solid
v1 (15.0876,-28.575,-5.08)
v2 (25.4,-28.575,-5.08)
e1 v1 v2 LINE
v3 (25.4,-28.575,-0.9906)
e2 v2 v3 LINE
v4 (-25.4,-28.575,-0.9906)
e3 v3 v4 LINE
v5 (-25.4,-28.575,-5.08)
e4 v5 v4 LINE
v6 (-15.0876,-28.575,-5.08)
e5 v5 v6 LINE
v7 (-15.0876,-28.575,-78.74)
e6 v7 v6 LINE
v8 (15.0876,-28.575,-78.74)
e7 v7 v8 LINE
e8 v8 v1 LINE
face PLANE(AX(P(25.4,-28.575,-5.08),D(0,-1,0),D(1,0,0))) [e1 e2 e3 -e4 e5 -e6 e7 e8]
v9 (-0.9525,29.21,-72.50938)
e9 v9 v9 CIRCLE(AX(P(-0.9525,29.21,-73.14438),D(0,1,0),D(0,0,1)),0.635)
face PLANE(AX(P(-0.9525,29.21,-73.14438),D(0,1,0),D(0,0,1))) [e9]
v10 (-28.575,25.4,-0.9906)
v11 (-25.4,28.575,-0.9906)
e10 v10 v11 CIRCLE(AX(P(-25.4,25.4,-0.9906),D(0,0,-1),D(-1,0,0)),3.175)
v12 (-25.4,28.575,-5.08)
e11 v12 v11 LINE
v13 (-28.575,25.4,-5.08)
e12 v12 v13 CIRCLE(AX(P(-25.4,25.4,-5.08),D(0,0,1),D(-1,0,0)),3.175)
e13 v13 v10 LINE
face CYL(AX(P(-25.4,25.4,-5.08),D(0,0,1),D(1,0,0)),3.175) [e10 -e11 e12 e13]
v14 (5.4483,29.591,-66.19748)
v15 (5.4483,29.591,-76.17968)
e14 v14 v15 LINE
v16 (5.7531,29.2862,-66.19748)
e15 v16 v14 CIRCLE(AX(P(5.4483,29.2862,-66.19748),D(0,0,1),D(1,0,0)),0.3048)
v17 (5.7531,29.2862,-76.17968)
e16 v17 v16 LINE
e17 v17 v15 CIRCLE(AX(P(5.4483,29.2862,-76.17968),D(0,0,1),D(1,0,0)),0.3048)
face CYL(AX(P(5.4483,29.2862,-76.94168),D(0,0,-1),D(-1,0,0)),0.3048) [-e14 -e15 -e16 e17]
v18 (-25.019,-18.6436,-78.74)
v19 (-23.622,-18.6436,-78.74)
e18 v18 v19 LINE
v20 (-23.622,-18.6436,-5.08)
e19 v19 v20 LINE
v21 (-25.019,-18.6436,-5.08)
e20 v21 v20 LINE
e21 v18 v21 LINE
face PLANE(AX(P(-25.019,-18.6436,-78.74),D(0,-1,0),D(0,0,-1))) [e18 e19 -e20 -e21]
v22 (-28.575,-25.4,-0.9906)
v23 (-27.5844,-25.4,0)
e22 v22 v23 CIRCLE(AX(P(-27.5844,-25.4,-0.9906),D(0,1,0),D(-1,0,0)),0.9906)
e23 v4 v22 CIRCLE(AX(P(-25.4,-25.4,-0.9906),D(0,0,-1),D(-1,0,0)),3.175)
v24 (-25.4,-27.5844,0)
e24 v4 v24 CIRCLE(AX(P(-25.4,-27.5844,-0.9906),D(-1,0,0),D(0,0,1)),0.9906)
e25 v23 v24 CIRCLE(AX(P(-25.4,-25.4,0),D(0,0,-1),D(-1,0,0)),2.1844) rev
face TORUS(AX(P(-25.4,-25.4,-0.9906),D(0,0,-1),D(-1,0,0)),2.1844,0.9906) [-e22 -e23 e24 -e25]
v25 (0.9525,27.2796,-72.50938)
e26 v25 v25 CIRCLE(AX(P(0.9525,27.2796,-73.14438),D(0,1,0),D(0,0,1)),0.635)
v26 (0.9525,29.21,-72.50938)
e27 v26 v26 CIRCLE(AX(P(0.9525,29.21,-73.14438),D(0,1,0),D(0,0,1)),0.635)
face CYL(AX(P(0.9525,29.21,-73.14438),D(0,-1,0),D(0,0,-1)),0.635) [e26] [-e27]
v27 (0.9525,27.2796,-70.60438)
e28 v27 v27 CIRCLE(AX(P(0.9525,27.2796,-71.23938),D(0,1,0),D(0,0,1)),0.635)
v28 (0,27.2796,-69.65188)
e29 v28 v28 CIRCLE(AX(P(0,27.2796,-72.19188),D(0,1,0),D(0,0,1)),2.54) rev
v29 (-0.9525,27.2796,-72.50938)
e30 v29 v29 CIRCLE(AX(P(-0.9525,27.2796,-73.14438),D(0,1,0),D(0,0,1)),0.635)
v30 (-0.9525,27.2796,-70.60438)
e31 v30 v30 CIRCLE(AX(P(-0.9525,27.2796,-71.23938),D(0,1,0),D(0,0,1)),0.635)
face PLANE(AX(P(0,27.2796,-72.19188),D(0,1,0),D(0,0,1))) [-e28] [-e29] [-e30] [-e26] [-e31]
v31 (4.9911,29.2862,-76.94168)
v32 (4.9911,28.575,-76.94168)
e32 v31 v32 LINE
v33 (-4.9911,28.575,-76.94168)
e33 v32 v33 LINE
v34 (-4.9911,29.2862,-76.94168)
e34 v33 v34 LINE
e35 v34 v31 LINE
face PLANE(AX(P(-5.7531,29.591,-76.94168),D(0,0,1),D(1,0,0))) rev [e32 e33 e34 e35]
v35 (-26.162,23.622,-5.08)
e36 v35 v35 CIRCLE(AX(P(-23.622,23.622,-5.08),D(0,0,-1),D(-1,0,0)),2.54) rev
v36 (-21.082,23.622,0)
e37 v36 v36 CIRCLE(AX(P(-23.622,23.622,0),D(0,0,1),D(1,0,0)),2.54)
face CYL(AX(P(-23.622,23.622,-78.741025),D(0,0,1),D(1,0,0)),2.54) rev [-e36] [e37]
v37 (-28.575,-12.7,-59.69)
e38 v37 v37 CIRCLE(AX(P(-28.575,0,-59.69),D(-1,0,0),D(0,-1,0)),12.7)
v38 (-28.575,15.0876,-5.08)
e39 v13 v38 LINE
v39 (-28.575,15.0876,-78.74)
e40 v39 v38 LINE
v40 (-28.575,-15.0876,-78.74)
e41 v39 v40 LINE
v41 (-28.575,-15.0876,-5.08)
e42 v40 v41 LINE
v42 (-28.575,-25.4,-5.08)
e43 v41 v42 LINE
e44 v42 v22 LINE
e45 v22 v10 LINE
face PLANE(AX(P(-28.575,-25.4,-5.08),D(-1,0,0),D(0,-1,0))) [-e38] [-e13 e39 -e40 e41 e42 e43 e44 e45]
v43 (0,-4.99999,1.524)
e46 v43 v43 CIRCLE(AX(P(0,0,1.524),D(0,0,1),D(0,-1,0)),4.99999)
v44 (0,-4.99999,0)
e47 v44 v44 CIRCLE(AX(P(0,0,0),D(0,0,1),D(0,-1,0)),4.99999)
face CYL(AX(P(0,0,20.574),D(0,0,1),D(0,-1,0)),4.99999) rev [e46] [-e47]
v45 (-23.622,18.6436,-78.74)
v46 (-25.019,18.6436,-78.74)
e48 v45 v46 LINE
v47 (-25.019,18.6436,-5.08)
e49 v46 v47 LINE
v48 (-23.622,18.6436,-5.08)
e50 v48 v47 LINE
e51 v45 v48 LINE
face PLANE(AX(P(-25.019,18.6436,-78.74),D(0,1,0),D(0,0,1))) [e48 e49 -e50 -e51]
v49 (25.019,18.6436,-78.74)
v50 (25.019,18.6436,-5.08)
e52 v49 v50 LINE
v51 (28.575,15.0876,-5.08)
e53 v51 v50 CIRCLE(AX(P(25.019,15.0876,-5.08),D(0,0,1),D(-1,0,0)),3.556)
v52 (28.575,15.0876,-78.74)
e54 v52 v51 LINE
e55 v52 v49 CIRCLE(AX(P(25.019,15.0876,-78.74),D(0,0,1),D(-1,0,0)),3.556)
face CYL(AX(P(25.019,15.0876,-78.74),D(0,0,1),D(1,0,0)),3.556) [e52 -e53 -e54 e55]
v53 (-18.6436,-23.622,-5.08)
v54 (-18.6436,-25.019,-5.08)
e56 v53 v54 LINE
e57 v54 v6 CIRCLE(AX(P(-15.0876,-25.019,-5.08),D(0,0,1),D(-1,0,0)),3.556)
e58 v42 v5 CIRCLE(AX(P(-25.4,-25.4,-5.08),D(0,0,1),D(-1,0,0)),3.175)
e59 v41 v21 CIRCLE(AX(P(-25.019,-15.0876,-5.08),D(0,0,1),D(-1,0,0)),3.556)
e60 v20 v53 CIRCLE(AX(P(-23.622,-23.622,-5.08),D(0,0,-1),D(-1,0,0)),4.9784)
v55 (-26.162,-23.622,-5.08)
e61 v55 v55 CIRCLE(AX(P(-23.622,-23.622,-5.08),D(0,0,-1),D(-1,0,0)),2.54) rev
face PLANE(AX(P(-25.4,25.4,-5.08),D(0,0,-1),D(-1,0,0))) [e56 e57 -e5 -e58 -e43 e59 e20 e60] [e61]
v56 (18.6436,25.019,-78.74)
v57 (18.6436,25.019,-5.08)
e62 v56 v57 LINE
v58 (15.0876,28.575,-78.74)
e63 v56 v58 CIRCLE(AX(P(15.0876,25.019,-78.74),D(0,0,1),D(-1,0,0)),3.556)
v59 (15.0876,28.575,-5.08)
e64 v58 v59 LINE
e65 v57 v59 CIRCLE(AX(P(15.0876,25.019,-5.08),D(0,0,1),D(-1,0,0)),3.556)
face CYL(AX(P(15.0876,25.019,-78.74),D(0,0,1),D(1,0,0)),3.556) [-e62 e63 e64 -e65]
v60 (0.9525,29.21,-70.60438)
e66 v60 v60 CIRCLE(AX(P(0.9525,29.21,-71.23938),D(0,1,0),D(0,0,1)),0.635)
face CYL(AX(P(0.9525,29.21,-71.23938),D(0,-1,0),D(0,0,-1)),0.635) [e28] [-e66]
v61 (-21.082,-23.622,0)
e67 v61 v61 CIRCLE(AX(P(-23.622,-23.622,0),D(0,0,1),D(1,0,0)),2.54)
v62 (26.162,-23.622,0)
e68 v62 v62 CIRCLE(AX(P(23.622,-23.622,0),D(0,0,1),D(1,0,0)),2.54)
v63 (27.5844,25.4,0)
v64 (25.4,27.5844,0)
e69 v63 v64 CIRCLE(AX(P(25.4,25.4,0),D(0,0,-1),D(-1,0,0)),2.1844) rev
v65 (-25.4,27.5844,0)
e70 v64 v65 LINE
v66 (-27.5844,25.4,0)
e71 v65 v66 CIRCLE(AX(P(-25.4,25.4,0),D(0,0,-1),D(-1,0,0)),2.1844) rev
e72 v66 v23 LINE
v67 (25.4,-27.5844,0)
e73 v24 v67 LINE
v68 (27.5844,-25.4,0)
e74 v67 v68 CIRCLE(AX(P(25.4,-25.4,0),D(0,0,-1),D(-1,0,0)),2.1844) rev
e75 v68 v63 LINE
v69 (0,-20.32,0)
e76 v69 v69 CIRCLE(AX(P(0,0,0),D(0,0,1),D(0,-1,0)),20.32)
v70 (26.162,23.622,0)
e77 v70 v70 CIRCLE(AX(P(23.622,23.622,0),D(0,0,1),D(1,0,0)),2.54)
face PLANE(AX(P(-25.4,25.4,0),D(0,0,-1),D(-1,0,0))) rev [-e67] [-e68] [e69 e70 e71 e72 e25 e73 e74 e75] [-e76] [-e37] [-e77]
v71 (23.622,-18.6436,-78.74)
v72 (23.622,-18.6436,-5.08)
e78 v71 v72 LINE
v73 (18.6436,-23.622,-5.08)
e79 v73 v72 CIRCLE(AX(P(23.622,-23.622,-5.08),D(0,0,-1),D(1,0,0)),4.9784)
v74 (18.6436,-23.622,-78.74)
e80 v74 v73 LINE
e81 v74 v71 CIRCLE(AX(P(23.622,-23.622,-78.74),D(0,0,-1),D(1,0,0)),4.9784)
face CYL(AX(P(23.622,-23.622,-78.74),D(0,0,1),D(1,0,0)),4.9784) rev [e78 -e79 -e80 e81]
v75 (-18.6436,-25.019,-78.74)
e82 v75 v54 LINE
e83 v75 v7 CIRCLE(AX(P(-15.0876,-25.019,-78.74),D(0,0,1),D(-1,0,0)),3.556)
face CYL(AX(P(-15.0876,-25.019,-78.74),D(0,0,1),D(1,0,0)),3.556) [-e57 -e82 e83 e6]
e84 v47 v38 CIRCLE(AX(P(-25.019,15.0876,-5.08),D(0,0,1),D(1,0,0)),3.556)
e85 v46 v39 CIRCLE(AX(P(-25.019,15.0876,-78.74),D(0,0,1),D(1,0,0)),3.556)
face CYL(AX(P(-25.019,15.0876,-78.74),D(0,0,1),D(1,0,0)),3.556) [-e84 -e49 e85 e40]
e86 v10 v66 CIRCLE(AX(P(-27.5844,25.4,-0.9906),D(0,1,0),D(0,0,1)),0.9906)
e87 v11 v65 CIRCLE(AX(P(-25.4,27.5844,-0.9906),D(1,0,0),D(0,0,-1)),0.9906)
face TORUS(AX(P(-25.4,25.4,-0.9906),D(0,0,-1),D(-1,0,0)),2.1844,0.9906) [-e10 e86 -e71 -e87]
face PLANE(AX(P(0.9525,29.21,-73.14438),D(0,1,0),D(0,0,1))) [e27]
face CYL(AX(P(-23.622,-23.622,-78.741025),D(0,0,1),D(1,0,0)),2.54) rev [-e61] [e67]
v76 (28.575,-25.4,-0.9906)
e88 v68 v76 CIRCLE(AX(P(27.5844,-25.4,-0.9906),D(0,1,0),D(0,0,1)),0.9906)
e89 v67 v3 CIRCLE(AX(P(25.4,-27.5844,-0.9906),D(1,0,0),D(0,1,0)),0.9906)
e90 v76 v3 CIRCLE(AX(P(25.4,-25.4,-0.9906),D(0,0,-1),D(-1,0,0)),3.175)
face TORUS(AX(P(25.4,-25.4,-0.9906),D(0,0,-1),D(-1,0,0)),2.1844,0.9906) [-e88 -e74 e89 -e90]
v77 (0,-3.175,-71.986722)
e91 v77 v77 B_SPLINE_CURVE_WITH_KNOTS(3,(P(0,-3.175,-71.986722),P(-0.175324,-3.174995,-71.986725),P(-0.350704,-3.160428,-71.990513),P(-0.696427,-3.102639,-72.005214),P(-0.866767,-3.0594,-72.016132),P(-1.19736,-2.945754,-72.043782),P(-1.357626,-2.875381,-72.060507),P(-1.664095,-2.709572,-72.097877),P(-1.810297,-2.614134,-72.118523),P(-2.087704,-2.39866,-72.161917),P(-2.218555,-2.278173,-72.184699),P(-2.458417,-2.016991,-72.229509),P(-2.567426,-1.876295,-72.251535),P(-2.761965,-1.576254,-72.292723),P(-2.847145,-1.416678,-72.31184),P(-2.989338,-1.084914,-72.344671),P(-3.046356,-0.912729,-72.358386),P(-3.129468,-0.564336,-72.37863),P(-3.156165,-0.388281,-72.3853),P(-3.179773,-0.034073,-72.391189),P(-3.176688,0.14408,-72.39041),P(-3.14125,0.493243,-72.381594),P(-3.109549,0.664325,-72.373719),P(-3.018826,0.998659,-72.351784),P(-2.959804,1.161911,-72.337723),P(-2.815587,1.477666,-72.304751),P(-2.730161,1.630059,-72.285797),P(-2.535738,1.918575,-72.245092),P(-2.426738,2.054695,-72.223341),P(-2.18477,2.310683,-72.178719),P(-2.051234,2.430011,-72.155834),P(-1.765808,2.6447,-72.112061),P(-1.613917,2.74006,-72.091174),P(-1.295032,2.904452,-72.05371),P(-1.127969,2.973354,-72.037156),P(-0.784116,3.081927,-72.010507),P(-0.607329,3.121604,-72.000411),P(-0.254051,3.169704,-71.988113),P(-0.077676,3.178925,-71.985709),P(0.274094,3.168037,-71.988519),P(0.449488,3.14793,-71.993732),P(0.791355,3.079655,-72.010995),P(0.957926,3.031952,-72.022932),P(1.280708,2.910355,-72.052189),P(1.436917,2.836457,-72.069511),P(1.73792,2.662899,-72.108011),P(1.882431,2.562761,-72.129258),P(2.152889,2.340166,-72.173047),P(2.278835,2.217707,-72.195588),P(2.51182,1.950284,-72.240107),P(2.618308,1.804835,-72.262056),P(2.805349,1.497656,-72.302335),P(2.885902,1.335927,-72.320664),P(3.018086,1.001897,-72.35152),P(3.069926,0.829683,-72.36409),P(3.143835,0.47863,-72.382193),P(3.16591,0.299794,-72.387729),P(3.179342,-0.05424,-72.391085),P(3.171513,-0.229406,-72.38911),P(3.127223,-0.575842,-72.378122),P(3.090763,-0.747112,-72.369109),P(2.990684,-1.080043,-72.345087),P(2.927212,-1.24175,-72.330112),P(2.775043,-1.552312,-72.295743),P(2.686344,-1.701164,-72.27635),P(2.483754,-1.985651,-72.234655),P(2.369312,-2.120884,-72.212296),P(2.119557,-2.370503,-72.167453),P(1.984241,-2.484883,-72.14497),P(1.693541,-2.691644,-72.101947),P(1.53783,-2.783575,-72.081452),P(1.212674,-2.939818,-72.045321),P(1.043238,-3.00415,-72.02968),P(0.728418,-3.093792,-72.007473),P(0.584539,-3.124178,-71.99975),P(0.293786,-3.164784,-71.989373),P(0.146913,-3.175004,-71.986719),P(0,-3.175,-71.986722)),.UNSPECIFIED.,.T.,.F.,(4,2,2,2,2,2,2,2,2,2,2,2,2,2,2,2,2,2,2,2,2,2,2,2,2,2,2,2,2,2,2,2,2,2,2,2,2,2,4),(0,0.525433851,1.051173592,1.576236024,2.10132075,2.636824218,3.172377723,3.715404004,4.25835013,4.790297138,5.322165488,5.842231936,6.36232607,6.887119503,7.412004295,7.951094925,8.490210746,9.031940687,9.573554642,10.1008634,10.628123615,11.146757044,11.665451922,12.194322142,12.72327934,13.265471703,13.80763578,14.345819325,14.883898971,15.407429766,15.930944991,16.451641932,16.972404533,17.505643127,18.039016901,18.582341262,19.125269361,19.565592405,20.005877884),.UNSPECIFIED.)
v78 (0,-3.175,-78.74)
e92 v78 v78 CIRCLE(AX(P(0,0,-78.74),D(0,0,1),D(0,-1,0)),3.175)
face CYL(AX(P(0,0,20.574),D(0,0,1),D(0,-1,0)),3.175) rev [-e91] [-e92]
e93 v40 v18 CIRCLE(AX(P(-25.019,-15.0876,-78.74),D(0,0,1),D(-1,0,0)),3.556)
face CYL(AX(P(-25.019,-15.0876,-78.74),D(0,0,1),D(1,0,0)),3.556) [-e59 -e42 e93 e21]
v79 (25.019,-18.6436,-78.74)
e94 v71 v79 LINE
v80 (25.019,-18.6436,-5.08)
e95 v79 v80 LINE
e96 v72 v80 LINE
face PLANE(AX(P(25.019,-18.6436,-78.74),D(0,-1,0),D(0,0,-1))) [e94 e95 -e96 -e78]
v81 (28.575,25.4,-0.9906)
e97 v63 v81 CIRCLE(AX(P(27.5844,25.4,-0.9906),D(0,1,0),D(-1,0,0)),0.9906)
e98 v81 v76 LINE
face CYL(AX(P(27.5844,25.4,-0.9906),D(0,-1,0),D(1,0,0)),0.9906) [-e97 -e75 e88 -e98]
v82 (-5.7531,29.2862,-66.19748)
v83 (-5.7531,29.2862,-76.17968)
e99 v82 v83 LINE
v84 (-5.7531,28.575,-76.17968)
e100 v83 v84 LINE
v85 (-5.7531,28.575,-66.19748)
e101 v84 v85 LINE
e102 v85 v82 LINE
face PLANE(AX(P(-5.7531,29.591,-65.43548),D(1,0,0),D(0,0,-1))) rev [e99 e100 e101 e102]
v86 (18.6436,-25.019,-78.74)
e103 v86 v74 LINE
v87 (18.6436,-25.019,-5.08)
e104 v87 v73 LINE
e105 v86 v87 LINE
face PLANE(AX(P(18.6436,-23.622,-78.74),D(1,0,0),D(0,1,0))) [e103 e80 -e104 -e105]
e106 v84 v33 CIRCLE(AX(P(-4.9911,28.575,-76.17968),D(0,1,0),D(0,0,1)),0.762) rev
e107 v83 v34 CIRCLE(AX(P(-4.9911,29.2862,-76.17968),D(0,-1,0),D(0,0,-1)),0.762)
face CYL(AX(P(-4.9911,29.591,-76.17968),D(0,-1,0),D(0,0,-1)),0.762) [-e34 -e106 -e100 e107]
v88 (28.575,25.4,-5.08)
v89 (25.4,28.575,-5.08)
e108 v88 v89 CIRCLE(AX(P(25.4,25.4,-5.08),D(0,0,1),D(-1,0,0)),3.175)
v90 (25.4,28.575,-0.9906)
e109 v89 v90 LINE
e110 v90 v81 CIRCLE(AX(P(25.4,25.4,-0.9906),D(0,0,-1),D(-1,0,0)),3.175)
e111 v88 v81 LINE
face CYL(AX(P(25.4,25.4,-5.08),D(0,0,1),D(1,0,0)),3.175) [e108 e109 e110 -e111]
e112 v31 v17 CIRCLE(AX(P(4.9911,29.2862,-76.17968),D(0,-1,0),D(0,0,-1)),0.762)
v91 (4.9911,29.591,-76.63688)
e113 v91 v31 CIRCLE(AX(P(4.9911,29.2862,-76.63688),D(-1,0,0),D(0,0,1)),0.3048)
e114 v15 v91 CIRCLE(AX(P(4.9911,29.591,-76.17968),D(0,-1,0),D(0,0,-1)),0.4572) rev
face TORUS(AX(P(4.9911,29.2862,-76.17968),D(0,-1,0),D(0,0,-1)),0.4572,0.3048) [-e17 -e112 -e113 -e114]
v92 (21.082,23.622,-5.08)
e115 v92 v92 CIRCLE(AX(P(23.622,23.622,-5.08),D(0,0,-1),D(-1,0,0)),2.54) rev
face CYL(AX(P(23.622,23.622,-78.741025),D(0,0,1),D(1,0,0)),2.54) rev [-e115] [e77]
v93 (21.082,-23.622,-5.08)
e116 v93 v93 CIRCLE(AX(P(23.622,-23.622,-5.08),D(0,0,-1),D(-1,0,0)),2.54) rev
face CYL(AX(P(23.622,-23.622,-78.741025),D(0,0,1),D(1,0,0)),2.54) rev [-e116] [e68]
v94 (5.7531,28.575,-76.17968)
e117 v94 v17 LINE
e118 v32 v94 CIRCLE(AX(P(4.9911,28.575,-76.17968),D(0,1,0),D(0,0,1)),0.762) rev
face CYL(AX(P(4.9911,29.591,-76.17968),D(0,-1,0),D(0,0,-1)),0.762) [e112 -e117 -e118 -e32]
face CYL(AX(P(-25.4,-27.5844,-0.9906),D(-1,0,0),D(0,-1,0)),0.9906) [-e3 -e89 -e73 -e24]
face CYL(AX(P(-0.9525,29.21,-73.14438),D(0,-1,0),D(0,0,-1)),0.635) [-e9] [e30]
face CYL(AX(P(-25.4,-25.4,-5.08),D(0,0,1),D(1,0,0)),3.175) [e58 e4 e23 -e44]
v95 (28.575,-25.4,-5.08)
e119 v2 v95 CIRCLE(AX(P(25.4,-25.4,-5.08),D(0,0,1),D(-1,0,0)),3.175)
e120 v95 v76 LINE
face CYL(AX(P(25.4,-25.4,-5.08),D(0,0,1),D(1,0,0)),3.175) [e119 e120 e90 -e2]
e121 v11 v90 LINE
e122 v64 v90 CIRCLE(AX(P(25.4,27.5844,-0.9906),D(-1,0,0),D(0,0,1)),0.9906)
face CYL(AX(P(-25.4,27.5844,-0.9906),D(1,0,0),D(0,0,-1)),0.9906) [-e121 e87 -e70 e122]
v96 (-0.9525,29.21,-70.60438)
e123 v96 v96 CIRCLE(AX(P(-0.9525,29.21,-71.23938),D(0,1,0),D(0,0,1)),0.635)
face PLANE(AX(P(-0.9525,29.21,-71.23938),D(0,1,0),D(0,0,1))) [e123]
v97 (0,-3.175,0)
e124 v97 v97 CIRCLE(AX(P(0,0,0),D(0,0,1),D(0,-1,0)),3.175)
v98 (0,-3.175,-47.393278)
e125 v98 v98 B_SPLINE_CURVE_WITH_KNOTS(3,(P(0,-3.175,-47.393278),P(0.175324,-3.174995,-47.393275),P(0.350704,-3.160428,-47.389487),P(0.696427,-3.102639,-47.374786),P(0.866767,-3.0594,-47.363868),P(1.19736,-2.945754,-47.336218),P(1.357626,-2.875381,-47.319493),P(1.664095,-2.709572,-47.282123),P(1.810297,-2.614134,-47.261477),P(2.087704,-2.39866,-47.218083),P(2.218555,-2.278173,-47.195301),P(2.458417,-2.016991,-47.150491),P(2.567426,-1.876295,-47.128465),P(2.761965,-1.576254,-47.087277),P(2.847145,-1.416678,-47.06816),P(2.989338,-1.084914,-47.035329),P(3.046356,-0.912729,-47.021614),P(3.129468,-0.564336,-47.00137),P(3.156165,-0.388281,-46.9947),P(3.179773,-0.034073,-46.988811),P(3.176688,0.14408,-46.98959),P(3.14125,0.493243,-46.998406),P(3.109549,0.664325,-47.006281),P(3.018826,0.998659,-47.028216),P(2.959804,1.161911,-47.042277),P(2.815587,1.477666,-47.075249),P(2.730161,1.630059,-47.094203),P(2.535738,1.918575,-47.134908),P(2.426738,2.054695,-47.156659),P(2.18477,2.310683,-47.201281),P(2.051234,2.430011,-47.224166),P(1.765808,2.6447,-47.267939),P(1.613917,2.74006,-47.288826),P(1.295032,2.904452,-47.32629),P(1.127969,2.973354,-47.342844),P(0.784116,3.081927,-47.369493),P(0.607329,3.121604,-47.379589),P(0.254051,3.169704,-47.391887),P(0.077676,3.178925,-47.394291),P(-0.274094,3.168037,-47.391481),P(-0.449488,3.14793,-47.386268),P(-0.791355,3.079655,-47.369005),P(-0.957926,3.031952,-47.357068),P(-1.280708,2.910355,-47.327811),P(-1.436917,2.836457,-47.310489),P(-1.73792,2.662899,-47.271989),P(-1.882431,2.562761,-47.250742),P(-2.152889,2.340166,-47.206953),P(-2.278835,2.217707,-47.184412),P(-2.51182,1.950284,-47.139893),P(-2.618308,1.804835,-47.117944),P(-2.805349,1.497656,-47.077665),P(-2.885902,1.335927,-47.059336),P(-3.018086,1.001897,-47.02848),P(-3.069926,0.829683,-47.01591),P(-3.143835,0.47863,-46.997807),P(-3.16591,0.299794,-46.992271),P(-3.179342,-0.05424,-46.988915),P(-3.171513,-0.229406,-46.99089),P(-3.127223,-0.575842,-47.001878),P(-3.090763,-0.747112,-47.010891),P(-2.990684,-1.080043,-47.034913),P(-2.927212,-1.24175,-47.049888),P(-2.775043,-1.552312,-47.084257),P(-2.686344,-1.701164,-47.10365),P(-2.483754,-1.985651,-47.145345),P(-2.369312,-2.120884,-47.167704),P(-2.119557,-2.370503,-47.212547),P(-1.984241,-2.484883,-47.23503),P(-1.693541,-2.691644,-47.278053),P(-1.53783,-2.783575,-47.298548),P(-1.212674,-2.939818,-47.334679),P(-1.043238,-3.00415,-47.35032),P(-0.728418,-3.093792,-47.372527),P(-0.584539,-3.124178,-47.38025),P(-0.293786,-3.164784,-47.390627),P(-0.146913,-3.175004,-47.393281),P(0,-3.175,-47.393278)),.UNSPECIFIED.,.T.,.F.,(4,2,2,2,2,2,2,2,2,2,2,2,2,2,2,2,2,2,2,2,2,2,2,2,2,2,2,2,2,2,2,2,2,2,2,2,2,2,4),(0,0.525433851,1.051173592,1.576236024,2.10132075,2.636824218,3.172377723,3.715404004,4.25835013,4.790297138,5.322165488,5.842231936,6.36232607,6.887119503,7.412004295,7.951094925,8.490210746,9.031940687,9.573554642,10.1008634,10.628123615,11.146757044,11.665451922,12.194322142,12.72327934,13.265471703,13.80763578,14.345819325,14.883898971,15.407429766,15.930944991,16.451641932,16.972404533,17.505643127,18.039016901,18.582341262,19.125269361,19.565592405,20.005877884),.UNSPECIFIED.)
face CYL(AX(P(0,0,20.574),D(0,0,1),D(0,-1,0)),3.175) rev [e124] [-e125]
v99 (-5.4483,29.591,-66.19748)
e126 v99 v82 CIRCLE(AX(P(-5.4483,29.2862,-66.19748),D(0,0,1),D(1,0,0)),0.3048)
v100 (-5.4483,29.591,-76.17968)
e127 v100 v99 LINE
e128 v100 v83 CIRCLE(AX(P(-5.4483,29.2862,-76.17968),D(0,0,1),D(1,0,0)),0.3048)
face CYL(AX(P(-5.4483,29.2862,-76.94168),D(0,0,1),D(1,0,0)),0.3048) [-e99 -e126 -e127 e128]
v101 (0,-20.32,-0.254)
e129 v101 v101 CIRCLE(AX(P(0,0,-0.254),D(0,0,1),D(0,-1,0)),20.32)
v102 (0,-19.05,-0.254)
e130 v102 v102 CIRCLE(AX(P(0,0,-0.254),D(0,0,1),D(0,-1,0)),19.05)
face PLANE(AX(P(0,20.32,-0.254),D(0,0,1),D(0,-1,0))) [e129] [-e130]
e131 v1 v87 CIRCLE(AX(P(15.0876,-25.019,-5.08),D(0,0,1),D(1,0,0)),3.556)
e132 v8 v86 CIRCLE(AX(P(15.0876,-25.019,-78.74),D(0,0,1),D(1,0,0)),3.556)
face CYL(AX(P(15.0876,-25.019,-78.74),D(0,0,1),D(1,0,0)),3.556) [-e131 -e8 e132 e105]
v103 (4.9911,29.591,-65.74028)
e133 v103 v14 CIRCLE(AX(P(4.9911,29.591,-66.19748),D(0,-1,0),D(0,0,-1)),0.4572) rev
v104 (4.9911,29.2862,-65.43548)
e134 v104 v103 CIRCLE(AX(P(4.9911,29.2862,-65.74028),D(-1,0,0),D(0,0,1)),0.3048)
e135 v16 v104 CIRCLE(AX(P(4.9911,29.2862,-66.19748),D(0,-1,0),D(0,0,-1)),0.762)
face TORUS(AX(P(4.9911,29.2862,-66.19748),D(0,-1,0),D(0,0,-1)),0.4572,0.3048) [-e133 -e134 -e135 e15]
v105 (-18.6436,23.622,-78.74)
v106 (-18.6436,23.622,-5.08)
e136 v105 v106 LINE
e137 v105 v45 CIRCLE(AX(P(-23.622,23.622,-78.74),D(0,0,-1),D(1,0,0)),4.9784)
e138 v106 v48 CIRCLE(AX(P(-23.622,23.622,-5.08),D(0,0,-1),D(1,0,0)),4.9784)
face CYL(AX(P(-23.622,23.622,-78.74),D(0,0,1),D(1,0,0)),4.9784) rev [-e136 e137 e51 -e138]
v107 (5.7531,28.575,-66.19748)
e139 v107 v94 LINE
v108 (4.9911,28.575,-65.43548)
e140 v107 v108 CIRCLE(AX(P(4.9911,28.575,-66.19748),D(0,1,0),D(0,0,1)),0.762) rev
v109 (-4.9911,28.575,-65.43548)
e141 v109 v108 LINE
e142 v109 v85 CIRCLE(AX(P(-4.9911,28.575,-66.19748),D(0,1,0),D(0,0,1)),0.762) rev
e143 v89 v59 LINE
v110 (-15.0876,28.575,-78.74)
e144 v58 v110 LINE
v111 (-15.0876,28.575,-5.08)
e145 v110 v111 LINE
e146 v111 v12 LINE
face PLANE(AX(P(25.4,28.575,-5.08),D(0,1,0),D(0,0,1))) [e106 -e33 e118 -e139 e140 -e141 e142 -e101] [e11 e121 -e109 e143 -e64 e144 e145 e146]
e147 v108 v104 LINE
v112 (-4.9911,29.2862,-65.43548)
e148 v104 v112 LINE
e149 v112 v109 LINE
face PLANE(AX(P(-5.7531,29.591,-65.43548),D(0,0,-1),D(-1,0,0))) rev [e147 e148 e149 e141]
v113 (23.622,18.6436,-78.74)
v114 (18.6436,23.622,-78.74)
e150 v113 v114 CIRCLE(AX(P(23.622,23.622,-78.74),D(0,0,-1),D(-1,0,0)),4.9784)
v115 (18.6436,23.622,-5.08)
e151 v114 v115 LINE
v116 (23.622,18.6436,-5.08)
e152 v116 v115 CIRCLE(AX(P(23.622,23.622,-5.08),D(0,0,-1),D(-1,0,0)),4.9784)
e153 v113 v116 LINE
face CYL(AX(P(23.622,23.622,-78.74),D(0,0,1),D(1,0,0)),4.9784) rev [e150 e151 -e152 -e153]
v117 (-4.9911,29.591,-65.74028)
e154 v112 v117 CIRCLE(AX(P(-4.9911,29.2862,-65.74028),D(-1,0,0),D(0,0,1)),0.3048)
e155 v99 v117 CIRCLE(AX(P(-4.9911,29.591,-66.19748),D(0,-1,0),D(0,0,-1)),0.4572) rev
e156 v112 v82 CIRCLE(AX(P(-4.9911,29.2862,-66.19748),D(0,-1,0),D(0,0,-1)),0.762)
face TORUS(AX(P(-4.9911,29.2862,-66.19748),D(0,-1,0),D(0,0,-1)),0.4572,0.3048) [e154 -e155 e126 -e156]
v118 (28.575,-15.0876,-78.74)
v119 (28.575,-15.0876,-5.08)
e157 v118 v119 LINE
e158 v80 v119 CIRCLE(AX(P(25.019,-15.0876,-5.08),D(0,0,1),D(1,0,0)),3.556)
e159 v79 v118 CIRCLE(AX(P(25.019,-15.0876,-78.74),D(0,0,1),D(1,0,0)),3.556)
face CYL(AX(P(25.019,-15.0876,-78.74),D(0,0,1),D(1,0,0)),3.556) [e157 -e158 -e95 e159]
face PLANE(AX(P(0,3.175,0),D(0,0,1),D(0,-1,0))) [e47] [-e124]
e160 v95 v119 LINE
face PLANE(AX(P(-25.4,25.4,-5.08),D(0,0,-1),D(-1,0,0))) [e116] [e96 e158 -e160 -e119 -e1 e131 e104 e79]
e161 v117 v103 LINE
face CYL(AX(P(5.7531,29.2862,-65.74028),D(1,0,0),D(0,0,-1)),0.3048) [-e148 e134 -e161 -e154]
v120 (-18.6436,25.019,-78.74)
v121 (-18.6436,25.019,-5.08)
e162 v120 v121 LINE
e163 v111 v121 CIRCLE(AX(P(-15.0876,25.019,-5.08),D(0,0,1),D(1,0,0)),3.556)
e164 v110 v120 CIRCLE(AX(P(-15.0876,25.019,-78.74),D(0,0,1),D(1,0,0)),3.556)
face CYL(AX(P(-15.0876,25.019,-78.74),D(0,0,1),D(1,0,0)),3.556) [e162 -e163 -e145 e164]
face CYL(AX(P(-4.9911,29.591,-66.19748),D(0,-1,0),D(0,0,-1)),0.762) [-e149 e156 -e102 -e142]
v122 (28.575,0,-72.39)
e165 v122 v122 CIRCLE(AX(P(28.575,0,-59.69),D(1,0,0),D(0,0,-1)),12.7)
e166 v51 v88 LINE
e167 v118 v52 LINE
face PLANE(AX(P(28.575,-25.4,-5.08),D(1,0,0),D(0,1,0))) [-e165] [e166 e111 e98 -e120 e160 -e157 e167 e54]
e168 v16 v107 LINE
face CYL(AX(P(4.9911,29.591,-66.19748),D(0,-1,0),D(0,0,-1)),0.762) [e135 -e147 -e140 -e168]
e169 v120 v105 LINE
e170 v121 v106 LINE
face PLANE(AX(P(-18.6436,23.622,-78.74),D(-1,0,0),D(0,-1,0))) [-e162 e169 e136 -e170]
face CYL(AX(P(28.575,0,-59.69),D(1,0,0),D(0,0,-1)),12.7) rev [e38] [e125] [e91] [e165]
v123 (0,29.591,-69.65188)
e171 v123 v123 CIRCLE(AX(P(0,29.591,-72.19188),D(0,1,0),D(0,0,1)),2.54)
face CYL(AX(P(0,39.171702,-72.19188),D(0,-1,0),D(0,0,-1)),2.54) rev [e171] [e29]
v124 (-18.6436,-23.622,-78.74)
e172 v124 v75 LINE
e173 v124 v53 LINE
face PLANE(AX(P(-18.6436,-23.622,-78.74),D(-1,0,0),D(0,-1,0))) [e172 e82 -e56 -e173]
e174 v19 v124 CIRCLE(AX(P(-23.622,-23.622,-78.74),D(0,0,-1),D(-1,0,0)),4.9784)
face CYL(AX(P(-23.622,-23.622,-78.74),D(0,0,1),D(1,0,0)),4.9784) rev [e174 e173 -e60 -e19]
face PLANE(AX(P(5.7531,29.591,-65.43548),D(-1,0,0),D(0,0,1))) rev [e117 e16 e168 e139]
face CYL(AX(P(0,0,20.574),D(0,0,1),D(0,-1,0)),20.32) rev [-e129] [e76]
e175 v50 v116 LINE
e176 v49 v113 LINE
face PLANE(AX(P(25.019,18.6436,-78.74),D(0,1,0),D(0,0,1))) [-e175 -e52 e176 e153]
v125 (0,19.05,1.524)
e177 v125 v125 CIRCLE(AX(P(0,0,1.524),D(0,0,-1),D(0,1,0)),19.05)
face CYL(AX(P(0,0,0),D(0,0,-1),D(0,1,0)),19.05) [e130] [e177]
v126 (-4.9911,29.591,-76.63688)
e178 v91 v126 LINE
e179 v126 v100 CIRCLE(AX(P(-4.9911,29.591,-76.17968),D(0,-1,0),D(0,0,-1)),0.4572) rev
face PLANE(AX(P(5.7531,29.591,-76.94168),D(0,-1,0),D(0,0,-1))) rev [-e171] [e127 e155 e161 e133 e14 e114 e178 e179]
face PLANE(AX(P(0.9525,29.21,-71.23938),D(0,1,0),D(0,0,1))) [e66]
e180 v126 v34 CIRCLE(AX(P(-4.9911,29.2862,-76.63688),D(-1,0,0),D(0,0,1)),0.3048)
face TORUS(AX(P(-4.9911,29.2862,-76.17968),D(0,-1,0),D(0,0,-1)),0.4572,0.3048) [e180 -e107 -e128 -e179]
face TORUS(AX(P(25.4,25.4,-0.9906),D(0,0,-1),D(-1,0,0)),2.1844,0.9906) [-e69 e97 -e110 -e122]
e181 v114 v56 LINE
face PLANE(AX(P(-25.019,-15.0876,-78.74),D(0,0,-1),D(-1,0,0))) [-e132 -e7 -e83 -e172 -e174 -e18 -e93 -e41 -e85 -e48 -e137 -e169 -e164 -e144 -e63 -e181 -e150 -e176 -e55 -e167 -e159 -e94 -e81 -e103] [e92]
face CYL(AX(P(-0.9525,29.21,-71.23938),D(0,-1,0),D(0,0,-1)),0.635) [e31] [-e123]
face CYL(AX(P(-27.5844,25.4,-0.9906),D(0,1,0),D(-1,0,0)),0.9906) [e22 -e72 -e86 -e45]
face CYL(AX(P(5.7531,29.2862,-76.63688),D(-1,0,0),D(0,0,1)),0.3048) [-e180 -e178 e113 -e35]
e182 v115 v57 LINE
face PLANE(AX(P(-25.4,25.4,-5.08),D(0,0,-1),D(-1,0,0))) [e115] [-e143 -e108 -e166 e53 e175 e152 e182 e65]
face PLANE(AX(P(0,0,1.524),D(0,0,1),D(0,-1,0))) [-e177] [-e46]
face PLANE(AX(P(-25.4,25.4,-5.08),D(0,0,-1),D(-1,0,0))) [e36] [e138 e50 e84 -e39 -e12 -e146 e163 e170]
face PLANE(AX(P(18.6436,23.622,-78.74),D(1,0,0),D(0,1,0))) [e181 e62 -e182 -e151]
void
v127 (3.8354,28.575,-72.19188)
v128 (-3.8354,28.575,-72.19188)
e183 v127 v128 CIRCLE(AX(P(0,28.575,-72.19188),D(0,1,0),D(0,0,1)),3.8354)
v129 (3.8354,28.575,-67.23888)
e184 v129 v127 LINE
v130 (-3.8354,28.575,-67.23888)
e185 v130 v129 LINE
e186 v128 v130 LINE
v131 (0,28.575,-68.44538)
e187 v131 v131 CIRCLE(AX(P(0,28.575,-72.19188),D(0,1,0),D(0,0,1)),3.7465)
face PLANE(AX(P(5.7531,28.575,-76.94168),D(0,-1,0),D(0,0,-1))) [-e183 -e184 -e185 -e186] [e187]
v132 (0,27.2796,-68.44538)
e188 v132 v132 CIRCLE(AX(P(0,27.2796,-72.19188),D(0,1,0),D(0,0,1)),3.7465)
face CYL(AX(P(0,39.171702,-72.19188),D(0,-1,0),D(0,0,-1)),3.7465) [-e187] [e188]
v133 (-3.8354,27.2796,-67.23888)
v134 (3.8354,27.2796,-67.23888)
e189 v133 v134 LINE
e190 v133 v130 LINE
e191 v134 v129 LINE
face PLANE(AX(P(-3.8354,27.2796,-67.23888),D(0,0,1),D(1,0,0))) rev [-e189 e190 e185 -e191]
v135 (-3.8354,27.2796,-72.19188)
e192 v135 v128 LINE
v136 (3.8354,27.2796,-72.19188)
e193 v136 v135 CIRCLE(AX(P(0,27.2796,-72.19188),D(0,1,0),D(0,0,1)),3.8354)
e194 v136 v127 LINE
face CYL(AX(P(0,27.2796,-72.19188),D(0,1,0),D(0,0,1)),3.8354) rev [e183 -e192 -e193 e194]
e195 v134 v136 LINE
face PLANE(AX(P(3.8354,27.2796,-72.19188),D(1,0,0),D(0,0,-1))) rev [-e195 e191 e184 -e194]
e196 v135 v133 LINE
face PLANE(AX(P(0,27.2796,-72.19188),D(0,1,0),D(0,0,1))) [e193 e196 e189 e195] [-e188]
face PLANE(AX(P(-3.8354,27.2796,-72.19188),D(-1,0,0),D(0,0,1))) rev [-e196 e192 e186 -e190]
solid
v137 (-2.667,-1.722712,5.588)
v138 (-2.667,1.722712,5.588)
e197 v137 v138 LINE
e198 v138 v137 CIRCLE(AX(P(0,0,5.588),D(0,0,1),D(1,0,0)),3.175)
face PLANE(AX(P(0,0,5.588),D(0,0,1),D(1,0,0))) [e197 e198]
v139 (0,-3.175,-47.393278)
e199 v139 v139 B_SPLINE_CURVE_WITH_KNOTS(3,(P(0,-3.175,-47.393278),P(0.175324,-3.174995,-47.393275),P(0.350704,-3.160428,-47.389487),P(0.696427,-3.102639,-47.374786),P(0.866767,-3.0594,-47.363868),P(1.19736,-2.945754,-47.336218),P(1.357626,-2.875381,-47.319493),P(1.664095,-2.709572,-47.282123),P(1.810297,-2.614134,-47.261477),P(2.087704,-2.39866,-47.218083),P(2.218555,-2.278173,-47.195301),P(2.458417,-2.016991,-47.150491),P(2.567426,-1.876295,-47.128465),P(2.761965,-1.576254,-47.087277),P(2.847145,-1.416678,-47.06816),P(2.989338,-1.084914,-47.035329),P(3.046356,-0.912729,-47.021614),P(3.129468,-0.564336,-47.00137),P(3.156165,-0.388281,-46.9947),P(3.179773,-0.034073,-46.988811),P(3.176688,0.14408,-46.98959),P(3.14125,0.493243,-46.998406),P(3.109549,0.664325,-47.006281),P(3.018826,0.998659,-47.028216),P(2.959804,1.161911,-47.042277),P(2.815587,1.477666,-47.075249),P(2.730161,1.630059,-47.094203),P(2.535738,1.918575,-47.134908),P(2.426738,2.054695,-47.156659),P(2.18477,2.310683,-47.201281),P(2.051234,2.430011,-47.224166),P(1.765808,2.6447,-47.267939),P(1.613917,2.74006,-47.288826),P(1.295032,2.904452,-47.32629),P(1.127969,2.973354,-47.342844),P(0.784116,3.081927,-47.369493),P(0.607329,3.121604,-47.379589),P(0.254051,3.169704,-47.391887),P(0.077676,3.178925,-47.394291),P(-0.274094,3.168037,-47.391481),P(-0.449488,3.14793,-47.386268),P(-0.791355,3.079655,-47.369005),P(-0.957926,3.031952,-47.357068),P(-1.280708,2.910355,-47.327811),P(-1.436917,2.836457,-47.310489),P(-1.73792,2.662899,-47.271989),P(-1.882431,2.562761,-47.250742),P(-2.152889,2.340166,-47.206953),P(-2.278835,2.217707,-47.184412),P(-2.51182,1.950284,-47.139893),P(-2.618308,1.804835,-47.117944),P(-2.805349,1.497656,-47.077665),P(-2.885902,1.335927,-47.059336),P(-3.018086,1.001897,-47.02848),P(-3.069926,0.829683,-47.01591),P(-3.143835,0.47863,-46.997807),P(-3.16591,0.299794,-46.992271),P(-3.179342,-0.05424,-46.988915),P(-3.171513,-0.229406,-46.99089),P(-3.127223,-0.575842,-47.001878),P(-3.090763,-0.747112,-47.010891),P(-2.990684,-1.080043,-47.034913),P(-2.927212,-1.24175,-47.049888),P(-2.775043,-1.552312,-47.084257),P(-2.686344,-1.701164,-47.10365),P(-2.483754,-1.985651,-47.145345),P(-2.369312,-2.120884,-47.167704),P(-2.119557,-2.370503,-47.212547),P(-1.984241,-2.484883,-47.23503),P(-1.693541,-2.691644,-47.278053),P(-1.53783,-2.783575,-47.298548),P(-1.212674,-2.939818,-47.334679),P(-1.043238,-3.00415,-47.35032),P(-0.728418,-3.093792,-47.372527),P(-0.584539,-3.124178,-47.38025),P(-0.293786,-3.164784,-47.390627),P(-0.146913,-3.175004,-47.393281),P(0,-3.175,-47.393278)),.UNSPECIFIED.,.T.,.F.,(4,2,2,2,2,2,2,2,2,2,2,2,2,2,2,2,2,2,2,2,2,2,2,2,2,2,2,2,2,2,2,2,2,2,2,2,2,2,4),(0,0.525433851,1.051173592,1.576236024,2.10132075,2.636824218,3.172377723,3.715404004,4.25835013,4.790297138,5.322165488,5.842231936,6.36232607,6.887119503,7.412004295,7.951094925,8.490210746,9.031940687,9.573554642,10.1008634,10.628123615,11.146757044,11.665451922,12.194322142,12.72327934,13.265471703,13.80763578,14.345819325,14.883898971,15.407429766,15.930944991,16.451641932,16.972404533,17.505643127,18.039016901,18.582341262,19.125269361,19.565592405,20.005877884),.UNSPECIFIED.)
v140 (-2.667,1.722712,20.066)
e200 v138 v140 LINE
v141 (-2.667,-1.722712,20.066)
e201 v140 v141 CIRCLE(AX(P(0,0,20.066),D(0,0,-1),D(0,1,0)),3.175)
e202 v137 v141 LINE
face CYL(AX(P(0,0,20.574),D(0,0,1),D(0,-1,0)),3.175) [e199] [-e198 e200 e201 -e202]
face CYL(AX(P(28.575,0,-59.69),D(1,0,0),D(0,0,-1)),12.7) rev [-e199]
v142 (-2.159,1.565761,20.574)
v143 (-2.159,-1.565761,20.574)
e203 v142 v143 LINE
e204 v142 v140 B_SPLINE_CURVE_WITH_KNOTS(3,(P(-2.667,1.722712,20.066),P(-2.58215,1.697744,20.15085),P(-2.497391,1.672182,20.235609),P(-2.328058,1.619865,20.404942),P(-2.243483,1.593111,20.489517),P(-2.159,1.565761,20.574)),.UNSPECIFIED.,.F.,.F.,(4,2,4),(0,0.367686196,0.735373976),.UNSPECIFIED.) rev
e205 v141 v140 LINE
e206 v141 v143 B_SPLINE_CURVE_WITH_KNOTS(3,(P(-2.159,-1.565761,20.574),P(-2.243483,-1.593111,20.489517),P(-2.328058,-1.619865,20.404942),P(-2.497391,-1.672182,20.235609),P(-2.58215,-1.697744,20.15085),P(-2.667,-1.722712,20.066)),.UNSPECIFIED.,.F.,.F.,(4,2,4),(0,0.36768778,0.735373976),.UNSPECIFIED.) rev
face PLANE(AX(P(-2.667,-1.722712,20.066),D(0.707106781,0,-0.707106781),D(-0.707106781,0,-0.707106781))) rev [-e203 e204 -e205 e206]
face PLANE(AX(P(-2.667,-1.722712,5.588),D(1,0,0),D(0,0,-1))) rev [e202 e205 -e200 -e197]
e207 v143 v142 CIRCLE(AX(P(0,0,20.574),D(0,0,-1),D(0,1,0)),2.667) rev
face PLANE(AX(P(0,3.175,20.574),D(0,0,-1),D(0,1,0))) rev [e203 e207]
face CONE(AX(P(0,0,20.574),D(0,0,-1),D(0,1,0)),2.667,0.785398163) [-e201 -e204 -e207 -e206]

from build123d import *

# Parameters (mm, degrees)
BOSS_EXTRUDE1_DEPTH              = 5.08
FILLET1_R                        = 0.9906
BOSS_EXTRUDE2_DEPTH              = 73.66
SKETCH5_W                        = 1.524
SKETCH5_H                        = 19.05
SKETCH6_W                        = 0.254
SKETCH6_H                        = 1.27
SKETCH7_W                        = 99.314
SKETCH7_H                        = 3.175
CUT_EXTRUDE1_START               = -14.986
CUT_EXTRUDE1_DEPTH               = 14.986
CHAMFER1_SIZE                    = 0.508
SKETCH9_R                        = 2.54
CUT_EXTRUDE2_DEPTH               = 5.08
CUT_EXTRUDE3_DEPTH               = 1.2954
SKETCH11_R                       = 3.7465
SKETCH11_R_2                     = 2.54
BOSS_EXTRUDE3_DEPTH              = 1.2954
SKETCH12_W                       = 11.5062
SKETCH12_H                       = 11.5062
SKETCH12_R                       = 2.54
BOSS_EXTRUDE4_DEPTH              = 1.016
FILLET2_R                        = 0.762
FILLET3_R                        = 0.3048
SKETCH13_R                       = 0.635
BOSS_EXTRUDE5_DEPTH              = 1.9304
F_1_START                        = -4
F_1_1_DIAMETER_HOLE1_DEPTH       = 8
F_1_START_2                      = -28.575
F_1_1_DIAMETER_HOLE1_2_OUTLINE_R = 12.7
F_1_1_DIAMETER_HOLE1_2_DEPTH     = 57.15


with BuildPart() as part:
    # Sketch3 → Boss-Extrude1 (new body)
    with BuildSketch(Plane.XY):
        with BuildLine():
            Line((-28.575, -25.4), (-28.575, 25.4))
            ThreePointArc((-28.575, 25.4), (-27.64506403, 27.64506403), (-25.4, 28.575))
            Line((-25.4, 28.575), (25.4, 28.575))
            ThreePointArc((25.4, 28.575), (27.64506403, 27.64506403), (28.575, 25.4))
            Line((28.575, 25.4), (28.575, -25.4))
            ThreePointArc((28.575, -25.4), (27.64506403, -27.64506403), (25.4, -28.575))
            Line((25.4, -28.575), (-25.4, -28.575))
            ThreePointArc((-25.4, -28.575), (-27.64506403, -27.64506403), (-28.575, -25.4))
        make_face()
    extrude(amount=-BOSS_EXTRUDE1_DEPTH)

    # Fillet1
    fillet1_edges = [part.edges().sort_by_distance(p)[0] for p in [
        (-28.575, 0, 0),
        (-27.64506403, 27.64506403, 0),
        (0, 28.575, 0),
        (27.64506403, 27.64506403, 0),
        (28.575, 0, 0),
        (27.64506403, -27.64506403, 0),
        (0, -28.575, 0),
        (-27.64506403, -27.64506403, 0),
    ]]
    fillet(fillet1_edges, radius=FILLET1_R)

    # Sketch4 → Boss-Extrude2 (add)
    with BuildSketch(Plane.XY.offset(-5.08)):
        with BuildLine():
            Line((-25.019, 18.6436), (-23.622, 18.6436))
            ThreePointArc((-23.622, 18.6436), (-20.101739601, 20.101739601), (-18.6436, 23.622))
            Line((-18.6436, 23.622), (-18.6436, 25.019))
            ThreePointArc((-18.6436, 25.019), (-17.602071714, 27.533471714), (-15.0876, 28.575))
            Line((-15.0876, 28.575), (15.0876, 28.575))
            ThreePointArc((15.0876, 28.575), (17.602071714, 27.533471714), (18.6436, 25.019))
            Line((18.6436, 25.019), (18.6436, 23.622))
            ThreePointArc((18.6436, 23.622), (20.101739601, 20.101739601), (23.622, 18.6436))
            Line((23.622, 18.6436), (25.019, 18.6436))
            ThreePointArc((25.019, 18.6436), (27.533471714, 17.602071714), (28.575, 15.0876))
            Line((28.575, 15.0876), (28.575, -15.0876))
            ThreePointArc((28.575, -15.0876), (27.533471714, -17.602071714), (25.019, -18.6436))
            Line((25.019, -18.6436), (23.622, -18.6436))
            ThreePointArc((23.622, -18.6436), (20.101739601, -20.101739601), (18.6436, -23.622))
            Line((18.6436, -23.622), (18.6436, -25.019))
            ThreePointArc((18.6436, -25.019), (17.602071714, -27.533471714), (15.0876, -28.575))
            Line((15.0876, -28.575), (-15.0876, -28.575))
            ThreePointArc((-15.0876, -28.575), (-17.602071714, -27.533471714), (-18.6436, -25.019))
            Line((-18.6436, -25.019), (-18.6436, -23.622))
            ThreePointArc((-18.6436, -23.622), (-20.101739601, -20.101739601), (-23.622, -18.6436))
            Line((-23.622, -18.6436), (-25.019, -18.6436))
            ThreePointArc((-25.019, -18.6436), (-27.533471714, -17.602071714), (-28.575, -15.0876))
            Line((-28.575, -15.0876), (-28.575, 15.0876))
            ThreePointArc((-28.575, 15.0876), (-27.533471714, 17.602071714), (-25.019, 18.6436))
        make_face()
    extrude(amount=-BOSS_EXTRUDE2_DEPTH)

    # Sketch5 → Revolve1 (revolve)
    with BuildSketch(Plane(origin=(0, 0, 0), x_dir=(0, 0, -1), z_dir=(1, 0, 0))):
        with Locations((-0.762, 9.525)):
            Rectangle(SKETCH5_W, SKETCH5_H)
    revolve(axis=Axis((0, 0, 0), (0, 0, 1)))

    # Sketch6 → Cut-Revolve1 (revolve, cut)
    with BuildSketch(Plane(origin=(0, 0, 0), x_dir=(0, 0, -1), z_dir=(1, 0, 0)), mode=Mode.PRIVATE) as cut_revolve1_sk:
        Polygon((78.74, 0), (-1.524, 0), (-1.524, 4.99999), (0, 4.99999), (0, 3.175), (78.74, 3.175), align=None)
        with Locations((0.127, 19.685)):
            Rectangle(SKETCH6_W, SKETCH6_H)
    revolve(cut_revolve1_sk.sketch.rotate(Axis((0, 0, 20.574), (0, 0, -1)), 180), axis=Axis((0, 0, 20.574), (0, 0, -1)), mode=Mode.SUBTRACT)

    # Sketch9 → Cut-Extrude2 (cut)
    with BuildSketch(Plane.XY):
        with Locations((23.622, -23.622)):
            Circle(SKETCH9_R)
        with Locations((-23.622, -23.622)):
            Circle(SKETCH9_R)
        with Locations((-23.622, 23.622)):
            Circle(SKETCH9_R)
        with Locations((23.622, 23.622)):
            Circle(SKETCH9_R)
    extrude(amount=-CUT_EXTRUDE2_DEPTH, mode=Mode.SUBTRACT)

    # Sketch10 → Cut-Extrude3 (cut)
    with BuildSketch(Plane(origin=(0, 28.575, -0.751200197), x_dir=(1, 0, 0), z_dir=(0, 1, 0))):
        with BuildLine():
            Line((-3.8354, 71.440679803), (-3.8354, 66.487679803))
            Line((-3.8354, 66.487679803), (3.8354, 66.487679803))
            Line((3.8354, 66.487679803), (3.8354, 71.440679803))
            ThreePointArc((3.8354, 71.440679803), (0, 75.276079803), (-3.8354, 71.440679803))
        make_face()
    extrude(amount=-CUT_EXTRUDE3_DEPTH, mode=Mode.SUBTRACT)

    # Sketch11 → Boss-Extrude3 (add)
    with BuildSketch(Plane(origin=(0, 27.2796, 0), x_dir=(1, 0, 0), z_dir=(0, 1, 0))):
        with Locations(Location((0, 72.19188, 0), (0, 0, 270))):
            Circle(SKETCH11_R)
        with Locations(Location((0, 72.19188, 0), (0, 0, 270))):
            Circle(SKETCH11_R_2, mode=Mode.SUBTRACT)
    extrude(amount=BOSS_EXTRUDE3_DEPTH)

    # Sketch12 → Boss-Extrude4 (add)
    with BuildSketch(Plane(origin=(0, 28.575, 0), x_dir=(1, 0, 0), z_dir=(0, 1, 0))):
        with Locations((0, 71.18858)):
            Rectangle(SKETCH12_W, SKETCH12_H)
        with Locations(Location((0, 72.19188, 0), (0, 0, 270))):
            Circle(SKETCH12_R, mode=Mode.SUBTRACT)
    extrude(amount=BOSS_EXTRUDE4_DEPTH)

    # Fillet2
    fillet2_edges = [part.edges().sort_by_distance(p)[0] for p in [
        (5.7531, 29.083, -65.43548),
        (5.7531, 29.083, -76.94168),
        (-5.7531, 29.083, -76.94168),
        (-5.7531, 29.083, -65.43548),
    ]]
    fillet(fillet2_edges, radius=FILLET2_R)

    # Fillet3
    fillet3_edges = [part.edges().sort_by_distance(p)[0] for p in [
        (0, 29.591, -76.94168),
        (5.7531, 29.591, -71.18858),
        (-5.7531, 29.591, -71.18858),
        (0, 29.591, -65.43548),
        (-5.529915367, 29.591, -65.658664633),
        (5.529915367, 29.591, -65.658664633),
        (-5.529915367, 29.591, -76.718495367),
        (5.529915367, 29.591, -76.718495367),
    ]]
    fillet(fillet3_edges, radius=FILLET3_R)

    # Sketch13 → Boss-Extrude5 (add)
    with BuildSketch(Plane(origin=(0, 27.2796, 0), x_dir=(1, 0, 0), z_dir=(0, 1, 0))):
        with Locations(Location((-0.9525, 73.14438, 0), (0, 0, 270))):
            Circle(SKETCH13_R)
        with Locations(Location((0.9525, 73.14438, 0), (0, 0, 270))):
            Circle(SKETCH13_R)
        with Locations(Location((0.9525, 71.23938, 0), (0, 0, 270))):
            Circle(SKETCH13_R)
        with Locations(Location((-0.9525, 71.23938, 0), (0, 0, 270))):
            Circle(SKETCH13_R)
    extrude(amount=BOSS_EXTRUDE5_DEPTH)

    # 1 _1_ Diameter Hole1 2 outline → 1 _1_ Diameter Hole1 2 (cut)
    with BuildSketch(Plane.YZ.offset(F_1_START_2)):
        with Locations((0, -59.69)):
            Circle(F_1_1_DIAMETER_HOLE1_2_OUTLINE_R)
    extrude(amount=F_1_1_DIAMETER_HOLE1_2_DEPTH, mode=Mode.SUBTRACT)


with BuildPart() as body_2:
    # Sketch7 → Revolve2 (revolve)
    with BuildSketch(Plane(origin=(0, 0, 0), x_dir=(0, 0, -1), z_dir=(1, 0, 0)), mode=Mode.PRIVATE) as revolve2_sk:
        with Locations((29.083, 1.5875)):
            Rectangle(SKETCH7_W, SKETCH7_H)
    revolve(revolve2_sk.sketch.rotate(Axis((0, 0, 20.574), (0, 0, -1)), 180), axis=Axis((0, 0, 20.574), (0, 0, -1)))

    # Sketch8 → Cut-Extrude1 (cut)
    with BuildSketch(Plane.XY.offset(20.574).offset(CUT_EXTRUDE1_START)):
        with BuildLine():
            Line((-2.667, -1.722711816), (-2.667, 1.722711816))
            ThreePointArc((-2.667, 1.722711816), (-3.175, 0), (-2.667, -1.722711816))
        make_face()
    extrude(amount=CUT_EXTRUDE1_DEPTH, mode=Mode.SUBTRACT)

    # Chamfer1
    chamfer1_edges = [body_2.edges().sort_by_distance(p)[0] for p in [
        (-2.667, 0, 20.574),
        (0, 3.175, -78.74),
        (2.78838977, 1.51838977, 20.574),
    ]]
    chamfer(chamfer1_edges, length=CHAMFER1_SIZE - 0.0001)  # a hair under: the kernel refuses the full size

    # 1 (1) Diameter Hole1: read off the stored shape, not the designer's step
    # 1 (1) Diameter Hole1 outline → 1 (1) Diameter Hole1 (cut)
    with BuildSketch(Plane.YZ.offset(F_1_START)):
        with BuildLine():
            Line((5, -47.86463102), (3.175885622, -47.393506576))
            ThreePointArc((3.175885622, -47.393506576), (0.000456639, -46.990000008), (-3.175001353, -47.393278225))
            Line((-3.175001353, -47.393278225), (-5, -47.864491064))
            Line((-5, -47.864491064), (-5, -78.74))
            Line((-5, -78.74), (5, -78.74))
            Line((5, -78.74), (5, -47.86463102))
        make_face()
    extrude(amount=F_1_1_DIAMETER_HOLE1_DEPTH, mode=Mode.SUBTRACT)


solid = Compound([part.part, body_2.part])
